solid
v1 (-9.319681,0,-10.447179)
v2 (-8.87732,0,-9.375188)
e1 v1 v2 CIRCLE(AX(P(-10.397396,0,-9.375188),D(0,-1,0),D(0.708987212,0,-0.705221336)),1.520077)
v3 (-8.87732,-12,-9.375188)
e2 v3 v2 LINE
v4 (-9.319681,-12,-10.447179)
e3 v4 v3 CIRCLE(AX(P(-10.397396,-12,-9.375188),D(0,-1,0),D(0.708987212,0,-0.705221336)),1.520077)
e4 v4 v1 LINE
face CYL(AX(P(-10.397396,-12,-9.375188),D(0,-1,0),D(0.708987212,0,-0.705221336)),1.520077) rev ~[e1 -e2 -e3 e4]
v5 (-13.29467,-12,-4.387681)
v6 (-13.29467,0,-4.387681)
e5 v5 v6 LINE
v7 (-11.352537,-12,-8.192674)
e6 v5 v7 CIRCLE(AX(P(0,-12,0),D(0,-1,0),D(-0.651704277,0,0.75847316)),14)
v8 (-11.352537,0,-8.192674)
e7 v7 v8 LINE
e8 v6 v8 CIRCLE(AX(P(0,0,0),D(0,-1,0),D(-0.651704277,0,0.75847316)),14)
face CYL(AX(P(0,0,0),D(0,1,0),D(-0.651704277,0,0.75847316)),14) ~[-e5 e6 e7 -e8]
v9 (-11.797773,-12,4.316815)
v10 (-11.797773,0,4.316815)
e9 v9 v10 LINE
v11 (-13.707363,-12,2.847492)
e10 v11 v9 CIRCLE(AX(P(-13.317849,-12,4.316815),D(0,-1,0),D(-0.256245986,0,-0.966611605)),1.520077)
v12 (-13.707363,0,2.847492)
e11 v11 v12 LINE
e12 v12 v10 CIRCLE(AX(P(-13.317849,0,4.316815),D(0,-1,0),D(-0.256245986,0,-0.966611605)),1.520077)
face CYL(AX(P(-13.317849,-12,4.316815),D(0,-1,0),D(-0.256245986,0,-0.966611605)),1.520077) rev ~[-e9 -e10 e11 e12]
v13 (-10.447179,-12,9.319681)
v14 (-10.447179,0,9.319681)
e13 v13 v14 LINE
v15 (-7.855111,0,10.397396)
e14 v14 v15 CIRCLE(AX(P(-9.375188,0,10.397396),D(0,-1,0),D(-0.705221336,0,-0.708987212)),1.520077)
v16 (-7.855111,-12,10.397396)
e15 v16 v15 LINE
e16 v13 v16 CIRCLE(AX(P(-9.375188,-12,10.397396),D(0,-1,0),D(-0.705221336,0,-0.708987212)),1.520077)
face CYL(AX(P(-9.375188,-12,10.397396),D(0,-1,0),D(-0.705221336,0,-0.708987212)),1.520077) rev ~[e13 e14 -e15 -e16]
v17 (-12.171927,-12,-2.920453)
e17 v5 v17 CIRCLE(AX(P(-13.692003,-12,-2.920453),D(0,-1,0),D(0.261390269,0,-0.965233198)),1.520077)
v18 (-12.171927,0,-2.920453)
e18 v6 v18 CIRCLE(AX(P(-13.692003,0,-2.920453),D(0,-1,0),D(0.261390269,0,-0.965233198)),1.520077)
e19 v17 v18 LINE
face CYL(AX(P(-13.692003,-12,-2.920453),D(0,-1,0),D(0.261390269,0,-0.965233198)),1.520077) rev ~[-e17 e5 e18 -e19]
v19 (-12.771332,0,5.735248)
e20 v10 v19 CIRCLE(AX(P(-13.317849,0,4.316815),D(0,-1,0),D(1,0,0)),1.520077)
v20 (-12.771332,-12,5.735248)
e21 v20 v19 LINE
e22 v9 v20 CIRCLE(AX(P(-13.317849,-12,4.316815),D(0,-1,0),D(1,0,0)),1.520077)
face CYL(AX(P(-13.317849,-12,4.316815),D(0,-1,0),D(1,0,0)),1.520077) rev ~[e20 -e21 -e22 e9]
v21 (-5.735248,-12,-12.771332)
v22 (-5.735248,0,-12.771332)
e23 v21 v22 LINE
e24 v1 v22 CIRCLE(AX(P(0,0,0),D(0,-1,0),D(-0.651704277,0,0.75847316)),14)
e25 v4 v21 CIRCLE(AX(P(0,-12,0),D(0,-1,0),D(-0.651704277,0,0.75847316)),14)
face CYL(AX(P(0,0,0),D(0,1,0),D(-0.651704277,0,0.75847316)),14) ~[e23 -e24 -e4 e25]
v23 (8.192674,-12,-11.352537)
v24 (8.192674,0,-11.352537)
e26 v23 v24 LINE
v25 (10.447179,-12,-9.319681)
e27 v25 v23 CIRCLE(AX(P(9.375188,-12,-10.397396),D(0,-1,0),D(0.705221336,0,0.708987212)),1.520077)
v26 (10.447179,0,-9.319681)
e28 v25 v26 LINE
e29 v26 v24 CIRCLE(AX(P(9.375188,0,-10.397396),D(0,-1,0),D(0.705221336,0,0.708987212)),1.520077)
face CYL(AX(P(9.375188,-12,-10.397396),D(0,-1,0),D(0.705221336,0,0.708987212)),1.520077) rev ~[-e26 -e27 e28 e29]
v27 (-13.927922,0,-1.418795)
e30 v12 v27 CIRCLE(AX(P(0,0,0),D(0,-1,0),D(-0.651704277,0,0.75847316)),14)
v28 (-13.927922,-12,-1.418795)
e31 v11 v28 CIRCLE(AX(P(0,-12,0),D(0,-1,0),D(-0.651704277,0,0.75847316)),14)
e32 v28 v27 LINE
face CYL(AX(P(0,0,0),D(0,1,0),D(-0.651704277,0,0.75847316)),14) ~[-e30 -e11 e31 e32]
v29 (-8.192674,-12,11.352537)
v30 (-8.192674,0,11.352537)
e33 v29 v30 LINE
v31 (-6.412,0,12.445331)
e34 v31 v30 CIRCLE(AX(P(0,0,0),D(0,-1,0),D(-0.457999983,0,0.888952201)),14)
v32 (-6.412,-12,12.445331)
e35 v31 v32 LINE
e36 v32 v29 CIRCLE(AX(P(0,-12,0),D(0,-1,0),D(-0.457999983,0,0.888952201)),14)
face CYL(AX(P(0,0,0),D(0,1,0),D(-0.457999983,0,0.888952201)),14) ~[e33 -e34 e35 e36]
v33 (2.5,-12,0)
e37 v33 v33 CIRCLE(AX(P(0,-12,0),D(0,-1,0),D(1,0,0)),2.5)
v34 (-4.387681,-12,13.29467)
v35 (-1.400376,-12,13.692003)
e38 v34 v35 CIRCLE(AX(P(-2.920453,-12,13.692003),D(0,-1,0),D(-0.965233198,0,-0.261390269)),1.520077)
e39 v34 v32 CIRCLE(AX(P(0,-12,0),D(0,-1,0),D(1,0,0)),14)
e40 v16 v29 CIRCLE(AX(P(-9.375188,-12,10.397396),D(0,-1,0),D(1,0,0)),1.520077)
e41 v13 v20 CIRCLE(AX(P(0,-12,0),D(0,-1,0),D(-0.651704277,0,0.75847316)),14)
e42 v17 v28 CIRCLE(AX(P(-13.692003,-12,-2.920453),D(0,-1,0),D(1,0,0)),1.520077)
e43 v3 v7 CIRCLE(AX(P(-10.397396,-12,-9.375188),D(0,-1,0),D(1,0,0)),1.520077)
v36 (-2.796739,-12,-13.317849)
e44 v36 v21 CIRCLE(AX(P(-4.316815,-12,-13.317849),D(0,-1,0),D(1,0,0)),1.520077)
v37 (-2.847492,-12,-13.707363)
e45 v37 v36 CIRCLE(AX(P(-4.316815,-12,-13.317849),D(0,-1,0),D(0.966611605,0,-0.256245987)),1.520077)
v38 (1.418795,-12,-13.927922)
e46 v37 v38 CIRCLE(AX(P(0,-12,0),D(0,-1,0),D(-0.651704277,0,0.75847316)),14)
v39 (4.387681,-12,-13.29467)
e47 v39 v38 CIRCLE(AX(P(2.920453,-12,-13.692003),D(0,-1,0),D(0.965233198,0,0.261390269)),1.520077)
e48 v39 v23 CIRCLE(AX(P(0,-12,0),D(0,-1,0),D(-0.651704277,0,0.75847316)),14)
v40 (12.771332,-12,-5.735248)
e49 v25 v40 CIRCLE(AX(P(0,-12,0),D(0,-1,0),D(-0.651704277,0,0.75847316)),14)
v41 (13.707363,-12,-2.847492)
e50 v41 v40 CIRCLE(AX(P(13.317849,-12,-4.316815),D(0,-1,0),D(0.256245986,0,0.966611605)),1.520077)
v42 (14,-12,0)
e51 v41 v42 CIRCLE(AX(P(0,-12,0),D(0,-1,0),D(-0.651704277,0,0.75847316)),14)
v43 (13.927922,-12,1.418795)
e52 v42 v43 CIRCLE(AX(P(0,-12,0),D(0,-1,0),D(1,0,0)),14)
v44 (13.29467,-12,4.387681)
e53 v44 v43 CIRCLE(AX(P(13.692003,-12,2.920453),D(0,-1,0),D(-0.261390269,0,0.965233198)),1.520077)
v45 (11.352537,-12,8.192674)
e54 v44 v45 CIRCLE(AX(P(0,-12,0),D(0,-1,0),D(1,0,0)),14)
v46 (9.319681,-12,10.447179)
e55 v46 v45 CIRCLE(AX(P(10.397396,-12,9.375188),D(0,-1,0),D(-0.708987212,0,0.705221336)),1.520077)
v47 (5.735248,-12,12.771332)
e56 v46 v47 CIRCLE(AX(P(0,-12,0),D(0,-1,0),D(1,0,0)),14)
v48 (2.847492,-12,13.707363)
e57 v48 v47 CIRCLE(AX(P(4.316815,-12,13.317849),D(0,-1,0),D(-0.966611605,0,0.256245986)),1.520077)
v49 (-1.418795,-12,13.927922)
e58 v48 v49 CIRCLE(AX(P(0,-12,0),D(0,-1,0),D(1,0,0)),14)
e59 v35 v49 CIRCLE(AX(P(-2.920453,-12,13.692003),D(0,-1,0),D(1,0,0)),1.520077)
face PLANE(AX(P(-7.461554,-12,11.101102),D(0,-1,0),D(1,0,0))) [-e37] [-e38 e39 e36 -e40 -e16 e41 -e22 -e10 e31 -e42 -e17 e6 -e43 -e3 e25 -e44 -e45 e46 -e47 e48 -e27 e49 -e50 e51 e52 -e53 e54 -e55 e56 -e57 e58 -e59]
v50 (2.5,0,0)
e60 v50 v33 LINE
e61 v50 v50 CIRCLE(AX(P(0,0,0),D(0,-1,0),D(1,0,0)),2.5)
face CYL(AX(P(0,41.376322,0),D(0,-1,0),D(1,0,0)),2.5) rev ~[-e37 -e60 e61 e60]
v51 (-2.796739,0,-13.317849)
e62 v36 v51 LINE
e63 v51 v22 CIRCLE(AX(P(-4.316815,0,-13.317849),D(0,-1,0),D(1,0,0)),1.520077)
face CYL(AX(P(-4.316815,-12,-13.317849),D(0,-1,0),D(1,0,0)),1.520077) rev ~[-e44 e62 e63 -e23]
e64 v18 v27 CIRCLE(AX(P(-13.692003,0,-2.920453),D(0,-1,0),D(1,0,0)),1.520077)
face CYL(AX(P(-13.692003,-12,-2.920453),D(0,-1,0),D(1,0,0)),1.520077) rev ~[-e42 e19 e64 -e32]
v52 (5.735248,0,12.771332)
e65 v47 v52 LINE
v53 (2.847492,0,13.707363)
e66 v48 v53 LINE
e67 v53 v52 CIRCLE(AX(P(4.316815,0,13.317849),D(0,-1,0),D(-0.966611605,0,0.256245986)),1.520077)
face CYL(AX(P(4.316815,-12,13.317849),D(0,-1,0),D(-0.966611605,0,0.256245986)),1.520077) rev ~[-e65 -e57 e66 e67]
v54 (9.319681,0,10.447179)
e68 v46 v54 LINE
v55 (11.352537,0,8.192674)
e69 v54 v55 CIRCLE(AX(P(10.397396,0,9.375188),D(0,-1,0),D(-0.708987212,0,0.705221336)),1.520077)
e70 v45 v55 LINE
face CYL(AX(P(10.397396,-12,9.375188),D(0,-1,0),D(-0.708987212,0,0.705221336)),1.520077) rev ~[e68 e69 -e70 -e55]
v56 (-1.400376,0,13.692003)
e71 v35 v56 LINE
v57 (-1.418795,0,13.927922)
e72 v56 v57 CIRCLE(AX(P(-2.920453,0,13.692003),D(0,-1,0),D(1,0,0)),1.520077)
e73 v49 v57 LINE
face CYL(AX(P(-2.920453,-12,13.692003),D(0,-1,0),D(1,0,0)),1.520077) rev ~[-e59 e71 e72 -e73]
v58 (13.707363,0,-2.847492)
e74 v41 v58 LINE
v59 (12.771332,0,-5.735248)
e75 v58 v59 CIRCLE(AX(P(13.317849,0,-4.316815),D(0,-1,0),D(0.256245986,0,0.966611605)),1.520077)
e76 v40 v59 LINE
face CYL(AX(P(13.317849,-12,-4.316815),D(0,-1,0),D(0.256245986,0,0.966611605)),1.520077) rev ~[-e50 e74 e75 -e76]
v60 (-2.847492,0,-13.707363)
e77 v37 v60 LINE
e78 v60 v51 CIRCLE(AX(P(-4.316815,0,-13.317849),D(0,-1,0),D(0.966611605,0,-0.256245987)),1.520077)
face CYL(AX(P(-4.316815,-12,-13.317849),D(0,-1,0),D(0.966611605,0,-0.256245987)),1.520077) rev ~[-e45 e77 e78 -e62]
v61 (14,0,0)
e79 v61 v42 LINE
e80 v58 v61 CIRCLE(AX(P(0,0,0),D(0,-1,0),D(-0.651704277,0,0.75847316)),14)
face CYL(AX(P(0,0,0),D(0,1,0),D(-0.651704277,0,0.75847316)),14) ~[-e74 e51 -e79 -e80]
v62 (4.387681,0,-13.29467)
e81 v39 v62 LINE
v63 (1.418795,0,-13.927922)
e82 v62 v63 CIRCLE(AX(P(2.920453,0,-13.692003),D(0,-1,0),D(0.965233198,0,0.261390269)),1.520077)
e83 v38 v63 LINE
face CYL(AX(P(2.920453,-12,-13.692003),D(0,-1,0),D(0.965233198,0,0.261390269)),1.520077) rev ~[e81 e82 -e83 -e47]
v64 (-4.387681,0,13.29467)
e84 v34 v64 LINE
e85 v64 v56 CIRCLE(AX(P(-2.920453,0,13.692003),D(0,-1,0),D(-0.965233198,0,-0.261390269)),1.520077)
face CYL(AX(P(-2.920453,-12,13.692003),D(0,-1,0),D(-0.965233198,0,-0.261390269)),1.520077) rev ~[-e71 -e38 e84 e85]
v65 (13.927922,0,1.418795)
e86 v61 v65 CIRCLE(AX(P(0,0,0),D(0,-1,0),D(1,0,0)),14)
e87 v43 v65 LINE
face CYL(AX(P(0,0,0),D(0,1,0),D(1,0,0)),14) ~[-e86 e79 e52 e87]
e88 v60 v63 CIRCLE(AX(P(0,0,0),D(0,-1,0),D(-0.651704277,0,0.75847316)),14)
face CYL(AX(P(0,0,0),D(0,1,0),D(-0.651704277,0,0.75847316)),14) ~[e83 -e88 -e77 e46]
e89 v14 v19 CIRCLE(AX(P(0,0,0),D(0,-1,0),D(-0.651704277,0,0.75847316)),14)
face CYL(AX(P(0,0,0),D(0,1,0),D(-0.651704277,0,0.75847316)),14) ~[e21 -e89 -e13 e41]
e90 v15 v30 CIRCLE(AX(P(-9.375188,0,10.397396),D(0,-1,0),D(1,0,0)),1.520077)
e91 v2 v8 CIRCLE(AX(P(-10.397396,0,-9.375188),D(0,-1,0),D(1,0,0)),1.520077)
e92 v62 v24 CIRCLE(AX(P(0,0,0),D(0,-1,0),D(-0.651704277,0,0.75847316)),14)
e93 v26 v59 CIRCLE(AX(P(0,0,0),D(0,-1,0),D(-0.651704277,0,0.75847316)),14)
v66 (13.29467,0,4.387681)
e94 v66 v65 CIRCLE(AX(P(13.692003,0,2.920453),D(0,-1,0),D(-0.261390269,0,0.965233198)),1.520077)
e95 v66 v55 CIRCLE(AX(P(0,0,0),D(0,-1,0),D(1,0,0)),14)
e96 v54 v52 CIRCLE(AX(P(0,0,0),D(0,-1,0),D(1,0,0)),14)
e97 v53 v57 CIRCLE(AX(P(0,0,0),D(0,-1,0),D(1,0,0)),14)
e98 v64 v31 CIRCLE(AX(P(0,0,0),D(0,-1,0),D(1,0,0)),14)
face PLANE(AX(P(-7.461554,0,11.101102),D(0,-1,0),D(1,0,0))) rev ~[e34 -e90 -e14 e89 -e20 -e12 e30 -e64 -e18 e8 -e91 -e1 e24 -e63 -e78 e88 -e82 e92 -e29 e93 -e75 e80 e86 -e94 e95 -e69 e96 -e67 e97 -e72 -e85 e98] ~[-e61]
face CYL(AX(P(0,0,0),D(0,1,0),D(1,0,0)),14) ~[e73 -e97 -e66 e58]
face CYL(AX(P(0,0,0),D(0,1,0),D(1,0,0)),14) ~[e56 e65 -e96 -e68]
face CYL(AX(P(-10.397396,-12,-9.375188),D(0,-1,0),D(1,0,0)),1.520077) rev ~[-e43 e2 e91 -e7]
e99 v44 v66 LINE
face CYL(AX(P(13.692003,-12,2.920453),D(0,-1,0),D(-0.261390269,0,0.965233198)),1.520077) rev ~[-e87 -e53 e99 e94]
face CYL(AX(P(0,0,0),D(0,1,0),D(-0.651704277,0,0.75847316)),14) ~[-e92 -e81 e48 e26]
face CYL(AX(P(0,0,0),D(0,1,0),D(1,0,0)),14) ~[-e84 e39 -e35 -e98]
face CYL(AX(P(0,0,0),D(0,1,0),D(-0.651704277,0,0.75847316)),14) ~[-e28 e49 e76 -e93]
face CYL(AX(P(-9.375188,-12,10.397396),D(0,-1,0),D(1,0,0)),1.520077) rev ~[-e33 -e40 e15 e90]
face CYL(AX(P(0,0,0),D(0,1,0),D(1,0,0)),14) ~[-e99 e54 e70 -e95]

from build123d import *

# Parameters (mm, degrees)
F1_DEPTH = 12
F3_DEPTH = 25
F5_D     = 5


with BuildPart() as f1:
    # F0 (on Front) → F1 (new body)
    with BuildSketch(Plane.XZ):
        with BuildLine():
            ThreePointArc((-6.1837801054, 11.6114190374), (-6.2418651063, 12.0437074429), (-6.411999761, 12.4453308138))
            ThreePointArc((-6.411999761, 12.4453308138), (-7.8214415512, 11.6114190374), (-9.1238598826, 10.6186242444))
            ThreePointArc((-9.1238598826, 10.6186242444), (-7.2975070499, 10.0598302873), (-6.1837801054, 11.6114190374))
        make_face()
        with BuildLine():
            ThreePointArc((-9.1238598826, 10.6186242444), (-5.8423437781, -12.7226970088), (14, 0))
            ThreePointArc((14, 0), (7.2880725623, 11.9534094854), (-6.411999761, 12.4453308138))
            ThreePointArc((-6.411999761, 12.4453308138), (-6.2418651063, 12.0437074429), (-6.1837801054, 11.6114190374))
            ThreePointArc((-6.1837801054, 11.6114190374), (-7.2975070499, 10.0598302873), (-9.1238598826, 10.6186242444))
        make_face()
    extrude(amount=F1_DEPTH)

    # F2 (on face) → F3 (cut)
    with BuildSketch(Plane.XZ.offset(12)):
        with BuildLine():
            ThreePointArc((-10.4471785382, 9.3196813567), (-8.7916106337, 8.9938043215), (-7.8551114747, 10.3973962329))
            ThreePointArc((-7.8551114747, 10.3973962329), (-7.9419845398, 10.903914247), (-8.1926740651, 11.3525367942))
            ThreePointArc((-8.1926740651, 11.3525367942), (-9.3751880821, 10.3973962329), (-10.4471785382, 9.3196813567))
        make_face()
        with BuildLine():
            ThreePointArc((-10.4471785382, 9.3196813567), (-9.3751880821, 10.3973962329), (-8.1926740651, 11.3525367942))
            ThreePointArc((-8.1926740651, 11.3525367942), (-10.393116946, 11.5263132895), (-10.4471785382, 9.3196813567))
        make_face()
        with BuildLine():
            ThreePointArc((-1.4187954682, 13.9279222937), (-2.9204529279, 13.692003312), (-4.3876813336, 13.2946700792))
            ThreePointArc((-4.3876813336, 13.2946700792), (-2.720036717, 12.1851966772), (-1.4003763205, 13.692003312))
            ThreePointArc((-1.4003763205, 13.692003312), (-1.4049881033, 13.810321771), (-1.4187954682, 13.9279222937))
        make_face()
        with BuildLine():
            ThreePointArc((-1.4187954682, 13.9279222937), (-3.237546655, 15.1786385936), (-4.3876813336, 13.2946700792))
            ThreePointArc((-4.3876813336, 13.2946700792), (-2.9204529279, 13.692003312), (-1.4187954682, 13.9279222937))
        make_face()
        with BuildLine():
            ThreePointArc((-13.7073626903, 2.847491541), (-13.3178491608, 4.3168152299), (-12.7713322624, 5.7352482286))
            ThreePointArc((-12.7713322624, 5.7352482286), (-14.7638599444, 4.7855216477), (-13.7073626903, 2.847491541))
        make_face()
        with BuildLine():
            ThreePointArc((-11.7977725535, 4.3168152299), (-12.0645773537, 5.1770144334), (-12.7713322624, 5.7352482286))
            ThreePointArc((-12.7713322624, 5.7352482286), (-13.3178491608, 4.3168152299), (-13.7073626903, 2.847491541))
            ThreePointArc((-13.7073626903, 2.847491541), (-12.3908803135, 3.112090511), (-11.7977725535, 4.3168152299))
        make_face()
        with BuildLine():
            ThreePointArc((5.7352482286, 12.7713322624), (4.3168152299, 13.3178491608), (2.847491541, 13.7073626903))
            ThreePointArc((2.847491541, 13.7073626903), (3.8481088121, 11.8718383773), (5.7352482286, 12.7713322624))
        make_face()
        with BuildLine():
            ThreePointArc((5.8368918373, 13.3178491608), (4.5132182902, 14.825184137), (2.847491541, 13.7073626903))
            ThreePointArc((2.847491541, 13.7073626903), (4.3168152299, 13.3178491608), (5.7352482286, 12.7713322624))
            ThreePointArc((5.7352482286, 12.7713322624), (5.8112649134, 13.0399048573), (5.8368918373, 13.3178491608))
        make_face()
        with BuildLine():
            ThreePointArc((-12.1719267046, -2.9204529279), (-12.7040716425, -1.7651936891), (-13.9279222937, -1.4187954682))
            ThreePointArc((-13.9279222937, -1.4187954682), (-13.692003312, -2.9204529279), (-13.2946700792, -4.3876813336))
            ThreePointArc((-13.2946700792, -4.3876813336), (-12.4848144608, -3.8442104556), (-12.1719267046, -2.9204529279))
        make_face()
        with BuildLine():
            ThreePointArc((11.3525367942, 8.1926740651), (10.3973962329, 9.3751880821), (9.3196813567, 10.4471785382))
            ThreePointArc((9.3196813567, 10.4471785382), (9.2684791764, 8.3572592183), (11.3525367942, 8.1926740651))
        make_face()
        with BuildLine():
            ThreePointArc((11.9174728403, 9.3751880821), (10.9772340204, 10.7803290119), (9.3196813567, 10.4471785382))
            ThreePointArc((9.3196813567, 10.4471785382), (10.3973962329, 9.3751880821), (11.3525367942, 8.1926740651))
            ThreePointArc((11.3525367942, 8.1926740651), (11.7689864991, 8.719922461), (11.9174728403, 9.3751880821))
        make_face()
        with BuildLine():
            ThreePointArc((-8.8773196255, -9.3751880821), (-9.7421306118, -8.003597816), (-11.3525367942, -8.1926740651))
            ThreePointArc((-11.3525367942, -8.1926740651), (-10.3973962329, -9.3751880821), (-9.3196813567, -10.4471785382))
            ThreePointArc((-9.3196813567, -10.4471785382), (-8.9922553032, -9.9550258696), (-8.8773196255, -9.3751880821))
        make_face()
        with BuildLine():
            ThreePointArc((13.9279222937, 1.4187954682), (13.692003312, 2.9204529279), (13.2946700792, 4.3876813336))
            ThreePointArc((13.2946700792, 4.3876813336), (12.2053680304, 2.6033592009), (13.9279222937, 1.4187954682))
        make_face()
        with BuildLine():
            ThreePointArc((15.2120799194, 2.9204529279), (14.6157608397, 4.1276417791), (13.2946700792, 4.3876813336))
            ThreePointArc((13.2946700792, 4.3876813336), (13.692003312, 2.9204529279), (13.9279222937, 1.4187954682))
            ThreePointArc((13.9279222937, 1.4187954682), (14.8472625508, 1.9325212585), (15.2120799194, 2.9204529279))
        make_face()
        with BuildLine():
            ThreePointArc((-2.7967386225, -13.3178491608), (-4.0388709263, -11.8233994774), (-5.7352482286, -12.7713322624))
            ThreePointArc((-5.7352482286, -12.7713322624), (-4.3168152299, -13.3178491608), (-2.847491541, -13.7073626903))
            ThreePointArc((-2.847491541, -13.7073626903), (-2.8094802537, -13.5142522211), (-2.7967386225, -13.3178491608))
        make_face()
        with BuildLine():
            ThreePointArc((4.3876813336, -13.2946700792), (2.9204529279, -13.692003312), (1.4187954682, -13.9279222937))
            ThreePointArc((1.4187954682, -13.9279222937), (3.0387713869, -15.2074681366), (4.4405295353, -13.692003312))
            ThreePointArc((4.4405295353, -13.692003312), (4.4272595627, -13.4915871011), (4.3876813336, -13.2946700792))
        make_face()
        with BuildLine():
            ThreePointArc((4.3876813336, -13.2946700792), (2.6033592009, -12.2053680304), (1.4187954682, -13.9279222937))
            ThreePointArc((1.4187954682, -13.9279222937), (2.9204529279, -13.692003312), (4.3876813336, -13.2946700792))
        make_face()
        with BuildLine():
            ThreePointArc((12.7713322624, -5.7352482286), (13.3178491608, -4.3168152299), (13.7073626903, -2.847491541))
            ThreePointArc((13.7073626903, -2.847491541), (11.8718383773, -3.8481088121), (12.7713322624, -5.7352482286))
        make_face()
        with BuildLine():
            ThreePointArc((14.8379257682, -4.3168152299), (14.5225738798, -3.3898463825), (13.7073626903, -2.847491541))
            ThreePointArc((13.7073626903, -2.847491541), (13.3178491608, -4.3168152299), (12.7713322624, -5.7352482286))
            ThreePointArc((12.7713322624, -5.7352482286), (14.1780483644, -5.570087037), (14.8379257682, -4.3168152299))
        make_face()
        with BuildLine():
            ThreePointArc((10.4471785382, -9.3196813567), (8.3572592183, -9.2684791764), (8.1926740651, -11.3525367942))
            ThreePointArc((8.1926740651, -11.3525367942), (9.3751880821, -10.3973962329), (10.4471785382, -9.3196813567))
        make_face()
    extrude(amount=-F3_DEPTH, mode=Mode.SUBTRACT)

    # F5 (through all)
    with Locations(Plane(origin=(0, 0, 0), x_dir=(-1, 0, 0), z_dir=(0, 1, 0))):
        with Locations((0, 0)):
            Hole(F5_D / 2)


solid = f1.part
